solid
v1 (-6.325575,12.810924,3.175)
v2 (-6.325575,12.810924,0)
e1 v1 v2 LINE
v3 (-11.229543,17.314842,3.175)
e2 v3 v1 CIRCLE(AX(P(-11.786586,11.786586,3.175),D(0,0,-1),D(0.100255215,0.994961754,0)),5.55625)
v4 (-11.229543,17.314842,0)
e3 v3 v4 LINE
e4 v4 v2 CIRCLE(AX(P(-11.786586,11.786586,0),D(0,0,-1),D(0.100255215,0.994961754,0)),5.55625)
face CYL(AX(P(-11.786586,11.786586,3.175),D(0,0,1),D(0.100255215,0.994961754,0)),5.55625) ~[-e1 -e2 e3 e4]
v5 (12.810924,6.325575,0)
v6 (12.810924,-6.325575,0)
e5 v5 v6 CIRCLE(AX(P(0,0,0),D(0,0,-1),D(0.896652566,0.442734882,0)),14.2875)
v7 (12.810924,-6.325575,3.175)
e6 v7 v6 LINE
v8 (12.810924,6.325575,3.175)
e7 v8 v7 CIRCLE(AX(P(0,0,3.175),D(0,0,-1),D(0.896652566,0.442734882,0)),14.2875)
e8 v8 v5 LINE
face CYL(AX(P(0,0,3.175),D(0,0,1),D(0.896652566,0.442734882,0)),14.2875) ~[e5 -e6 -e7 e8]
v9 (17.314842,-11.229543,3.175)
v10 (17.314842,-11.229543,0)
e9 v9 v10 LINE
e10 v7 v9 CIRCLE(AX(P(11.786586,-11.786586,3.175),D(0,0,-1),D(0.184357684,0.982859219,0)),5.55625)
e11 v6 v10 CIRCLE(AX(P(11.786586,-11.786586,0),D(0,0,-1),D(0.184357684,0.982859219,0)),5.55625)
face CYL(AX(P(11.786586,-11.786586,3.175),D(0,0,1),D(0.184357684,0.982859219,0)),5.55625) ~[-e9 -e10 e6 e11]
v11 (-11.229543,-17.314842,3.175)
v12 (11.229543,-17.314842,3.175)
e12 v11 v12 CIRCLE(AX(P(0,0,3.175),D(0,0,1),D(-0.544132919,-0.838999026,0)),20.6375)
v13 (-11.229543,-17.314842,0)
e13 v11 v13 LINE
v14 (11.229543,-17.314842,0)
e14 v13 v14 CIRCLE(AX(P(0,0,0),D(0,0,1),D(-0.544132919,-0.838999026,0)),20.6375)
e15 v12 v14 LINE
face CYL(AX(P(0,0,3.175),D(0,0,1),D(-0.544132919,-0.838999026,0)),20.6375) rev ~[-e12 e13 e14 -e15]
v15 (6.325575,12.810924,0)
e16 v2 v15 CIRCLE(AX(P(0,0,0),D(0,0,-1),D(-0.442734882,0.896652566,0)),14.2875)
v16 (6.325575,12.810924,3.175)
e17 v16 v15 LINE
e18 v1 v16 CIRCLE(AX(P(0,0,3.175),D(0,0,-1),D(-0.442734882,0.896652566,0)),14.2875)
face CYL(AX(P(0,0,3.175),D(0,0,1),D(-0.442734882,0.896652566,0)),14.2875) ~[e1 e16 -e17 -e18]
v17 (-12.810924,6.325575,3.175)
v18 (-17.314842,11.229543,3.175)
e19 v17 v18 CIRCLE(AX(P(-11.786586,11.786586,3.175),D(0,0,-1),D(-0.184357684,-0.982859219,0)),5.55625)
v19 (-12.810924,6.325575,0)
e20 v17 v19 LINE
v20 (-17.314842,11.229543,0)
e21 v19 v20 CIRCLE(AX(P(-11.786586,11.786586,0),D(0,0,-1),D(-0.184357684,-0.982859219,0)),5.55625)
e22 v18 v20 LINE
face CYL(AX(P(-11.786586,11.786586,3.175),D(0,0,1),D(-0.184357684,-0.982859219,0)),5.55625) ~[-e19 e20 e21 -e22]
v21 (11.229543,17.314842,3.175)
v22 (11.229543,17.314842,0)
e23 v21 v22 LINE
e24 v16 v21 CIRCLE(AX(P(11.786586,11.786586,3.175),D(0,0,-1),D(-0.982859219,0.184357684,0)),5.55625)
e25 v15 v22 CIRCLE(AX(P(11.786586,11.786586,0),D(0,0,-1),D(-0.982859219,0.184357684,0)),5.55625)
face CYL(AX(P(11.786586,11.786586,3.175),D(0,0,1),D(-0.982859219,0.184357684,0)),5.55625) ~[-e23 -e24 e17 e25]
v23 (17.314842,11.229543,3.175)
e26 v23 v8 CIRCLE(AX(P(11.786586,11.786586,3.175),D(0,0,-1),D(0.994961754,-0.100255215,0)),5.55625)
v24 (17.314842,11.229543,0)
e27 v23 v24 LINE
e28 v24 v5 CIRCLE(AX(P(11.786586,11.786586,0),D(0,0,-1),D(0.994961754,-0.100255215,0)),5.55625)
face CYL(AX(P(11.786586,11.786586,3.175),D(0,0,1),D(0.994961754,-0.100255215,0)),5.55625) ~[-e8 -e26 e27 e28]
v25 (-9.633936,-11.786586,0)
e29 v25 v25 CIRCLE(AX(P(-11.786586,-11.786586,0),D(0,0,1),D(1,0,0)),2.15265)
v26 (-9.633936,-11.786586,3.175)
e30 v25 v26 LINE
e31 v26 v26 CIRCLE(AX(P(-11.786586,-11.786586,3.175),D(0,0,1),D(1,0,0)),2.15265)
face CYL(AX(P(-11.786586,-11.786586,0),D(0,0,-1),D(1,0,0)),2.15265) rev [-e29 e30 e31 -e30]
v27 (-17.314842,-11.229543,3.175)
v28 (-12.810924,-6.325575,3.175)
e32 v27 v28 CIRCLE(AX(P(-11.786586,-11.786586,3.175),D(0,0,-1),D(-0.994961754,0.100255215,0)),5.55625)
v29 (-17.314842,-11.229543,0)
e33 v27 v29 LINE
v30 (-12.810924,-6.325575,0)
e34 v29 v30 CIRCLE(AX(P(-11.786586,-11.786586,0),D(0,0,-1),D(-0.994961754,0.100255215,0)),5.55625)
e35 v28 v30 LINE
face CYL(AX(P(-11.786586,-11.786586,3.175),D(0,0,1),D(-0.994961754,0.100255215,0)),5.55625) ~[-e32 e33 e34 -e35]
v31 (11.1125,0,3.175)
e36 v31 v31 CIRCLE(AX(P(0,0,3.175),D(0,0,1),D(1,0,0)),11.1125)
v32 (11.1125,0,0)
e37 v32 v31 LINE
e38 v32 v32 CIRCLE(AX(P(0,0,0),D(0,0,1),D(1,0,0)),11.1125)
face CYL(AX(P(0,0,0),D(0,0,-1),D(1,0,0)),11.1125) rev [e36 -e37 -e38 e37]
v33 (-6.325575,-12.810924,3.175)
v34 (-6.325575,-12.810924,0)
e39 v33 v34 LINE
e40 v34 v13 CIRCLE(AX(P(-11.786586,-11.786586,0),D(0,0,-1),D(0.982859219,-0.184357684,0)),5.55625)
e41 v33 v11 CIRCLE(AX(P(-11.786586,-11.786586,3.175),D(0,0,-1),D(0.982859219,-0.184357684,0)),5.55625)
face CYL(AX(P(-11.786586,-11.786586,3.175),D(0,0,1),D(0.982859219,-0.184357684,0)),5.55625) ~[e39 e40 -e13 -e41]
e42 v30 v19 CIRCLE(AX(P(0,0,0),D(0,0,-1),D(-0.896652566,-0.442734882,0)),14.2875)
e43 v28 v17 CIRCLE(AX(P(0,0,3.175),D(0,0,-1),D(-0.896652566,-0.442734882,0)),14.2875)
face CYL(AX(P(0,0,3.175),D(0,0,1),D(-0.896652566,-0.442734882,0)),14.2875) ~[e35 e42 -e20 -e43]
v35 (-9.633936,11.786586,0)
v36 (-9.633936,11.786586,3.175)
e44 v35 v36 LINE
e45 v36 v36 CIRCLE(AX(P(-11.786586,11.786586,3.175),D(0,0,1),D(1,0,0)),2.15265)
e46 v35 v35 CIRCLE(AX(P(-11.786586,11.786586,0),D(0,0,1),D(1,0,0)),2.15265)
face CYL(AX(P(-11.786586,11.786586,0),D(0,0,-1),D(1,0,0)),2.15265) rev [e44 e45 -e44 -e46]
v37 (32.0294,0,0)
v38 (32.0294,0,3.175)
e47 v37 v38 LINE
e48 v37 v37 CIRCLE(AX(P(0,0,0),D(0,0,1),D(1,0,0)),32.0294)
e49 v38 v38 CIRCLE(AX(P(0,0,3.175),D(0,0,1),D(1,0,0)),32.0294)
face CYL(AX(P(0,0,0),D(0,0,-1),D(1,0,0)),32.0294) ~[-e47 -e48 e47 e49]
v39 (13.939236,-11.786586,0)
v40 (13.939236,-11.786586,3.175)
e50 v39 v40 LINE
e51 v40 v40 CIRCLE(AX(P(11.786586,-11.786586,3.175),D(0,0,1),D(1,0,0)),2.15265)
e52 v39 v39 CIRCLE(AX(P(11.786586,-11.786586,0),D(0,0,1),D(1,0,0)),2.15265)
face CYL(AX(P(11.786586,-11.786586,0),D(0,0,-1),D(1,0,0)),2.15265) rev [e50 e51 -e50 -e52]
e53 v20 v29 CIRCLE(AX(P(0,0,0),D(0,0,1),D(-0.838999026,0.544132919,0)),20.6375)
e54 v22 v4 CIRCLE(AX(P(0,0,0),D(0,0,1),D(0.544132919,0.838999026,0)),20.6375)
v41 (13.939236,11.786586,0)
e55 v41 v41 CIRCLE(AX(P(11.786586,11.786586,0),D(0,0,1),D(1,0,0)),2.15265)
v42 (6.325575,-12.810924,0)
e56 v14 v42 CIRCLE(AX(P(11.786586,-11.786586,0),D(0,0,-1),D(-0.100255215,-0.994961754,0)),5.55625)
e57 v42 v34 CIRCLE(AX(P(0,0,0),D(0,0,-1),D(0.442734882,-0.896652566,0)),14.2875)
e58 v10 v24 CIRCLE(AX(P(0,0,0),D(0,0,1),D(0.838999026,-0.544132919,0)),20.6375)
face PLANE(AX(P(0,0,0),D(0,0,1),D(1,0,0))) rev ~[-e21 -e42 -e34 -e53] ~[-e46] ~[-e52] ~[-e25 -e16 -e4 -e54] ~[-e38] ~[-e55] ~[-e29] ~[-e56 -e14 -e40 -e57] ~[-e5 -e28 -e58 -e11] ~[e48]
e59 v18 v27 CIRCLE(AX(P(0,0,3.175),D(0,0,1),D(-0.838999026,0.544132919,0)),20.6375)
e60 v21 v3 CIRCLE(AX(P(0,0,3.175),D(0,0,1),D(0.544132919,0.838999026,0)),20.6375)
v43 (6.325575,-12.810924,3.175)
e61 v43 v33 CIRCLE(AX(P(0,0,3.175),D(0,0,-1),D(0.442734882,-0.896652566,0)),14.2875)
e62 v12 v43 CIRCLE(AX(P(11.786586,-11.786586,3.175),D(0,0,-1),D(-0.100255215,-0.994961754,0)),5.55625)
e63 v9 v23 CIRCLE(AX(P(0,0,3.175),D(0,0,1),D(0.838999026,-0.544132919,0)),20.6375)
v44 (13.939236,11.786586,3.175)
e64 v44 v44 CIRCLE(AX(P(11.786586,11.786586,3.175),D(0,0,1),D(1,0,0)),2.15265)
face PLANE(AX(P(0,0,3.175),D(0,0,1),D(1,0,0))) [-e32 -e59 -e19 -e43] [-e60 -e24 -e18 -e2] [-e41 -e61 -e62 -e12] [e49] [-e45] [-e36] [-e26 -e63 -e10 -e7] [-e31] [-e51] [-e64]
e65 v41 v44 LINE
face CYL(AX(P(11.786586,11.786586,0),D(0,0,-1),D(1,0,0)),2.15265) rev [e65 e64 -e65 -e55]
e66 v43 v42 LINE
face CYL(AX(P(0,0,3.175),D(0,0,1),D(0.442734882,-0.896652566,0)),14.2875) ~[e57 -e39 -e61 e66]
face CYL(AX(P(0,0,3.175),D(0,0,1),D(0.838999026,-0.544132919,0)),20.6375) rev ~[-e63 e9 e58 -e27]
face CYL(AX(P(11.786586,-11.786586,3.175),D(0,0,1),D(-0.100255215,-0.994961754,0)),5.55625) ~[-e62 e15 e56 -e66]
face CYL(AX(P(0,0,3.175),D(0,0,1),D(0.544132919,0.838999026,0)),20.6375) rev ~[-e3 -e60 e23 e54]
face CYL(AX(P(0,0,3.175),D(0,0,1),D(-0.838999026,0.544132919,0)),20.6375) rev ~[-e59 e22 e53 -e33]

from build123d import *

# Parameters (mm, degrees)
F0_R            = 32.0294
F0_R_2          = 2.15265
F0_R_3          = 11.1125
F1_DEPTH        = 3.175
F3_DEPTH        = 3.175
F3_COPIES_COUNT = 4


# Not quite as in the source:
# - a pattern or mirror of a feature is missing from the dataset's text; its kind, count and spacing are read off the source's solid
# - a feature names something its author has since deleted; it is built from what else it names


with BuildPart() as f1:
    # F0 (on Top) → F1 (new body)
    with BuildSketch(Plane.XY):
        Circle(F0_R)
        with Locations((-11.7865861589, -11.7865861589)):
            Circle(F0_R_2, mode=Mode.SUBTRACT)
        with Locations((11.7865861589, -11.7865861589)):
            Circle(F0_R_2, mode=Mode.SUBTRACT)
        with Locations((-11.7865861589, 11.7865861589)):
            Circle(F0_R_2, mode=Mode.SUBTRACT)
        Circle(F0_R_3, mode=Mode.SUBTRACT)
        with Locations((11.7865861589, 11.7865861589)):
            Circle(F0_R_2, mode=Mode.SUBTRACT)
    extrude(amount=F1_DEPTH)

    # F2 (on face) → F3 (cut, through all)
    with BuildSketch(Plane.XY.offset(3.175)):
        with BuildLine():
            ThreePointArc((-11.229543123, 17.3148424047), (-8.0281867, 15.8788163052), (-6.3255746232, 12.8109235396))
            ThreePointArc((-6.3255746232, 12.8109235396), (0, 14.2875), (6.3255746232, 12.8109235396))
            ThreePointArc((6.3255746232, 12.8109235396), (8.0281867, 15.8788163052), (11.229543123, 17.3148424047))
            ThreePointArc((11.229543123, 17.3148424047), (0, 20.6375), (-11.229543123, 17.3148424047))
        make_face()
    f3 = extrude(amount=-F3_DEPTH, mode=Mode.SUBTRACT)

    # F3_copies: F3 ×4 about axis
    f3_copies_axis = Axis((0, 0, 0), (0, 0, 1))
    for i in range(1, F3_COPIES_COUNT):
        add(f3.rotate(f3_copies_axis, i * 360 / F3_COPIES_COUNT), mode=Mode.SUBTRACT)


solid = f1.part
